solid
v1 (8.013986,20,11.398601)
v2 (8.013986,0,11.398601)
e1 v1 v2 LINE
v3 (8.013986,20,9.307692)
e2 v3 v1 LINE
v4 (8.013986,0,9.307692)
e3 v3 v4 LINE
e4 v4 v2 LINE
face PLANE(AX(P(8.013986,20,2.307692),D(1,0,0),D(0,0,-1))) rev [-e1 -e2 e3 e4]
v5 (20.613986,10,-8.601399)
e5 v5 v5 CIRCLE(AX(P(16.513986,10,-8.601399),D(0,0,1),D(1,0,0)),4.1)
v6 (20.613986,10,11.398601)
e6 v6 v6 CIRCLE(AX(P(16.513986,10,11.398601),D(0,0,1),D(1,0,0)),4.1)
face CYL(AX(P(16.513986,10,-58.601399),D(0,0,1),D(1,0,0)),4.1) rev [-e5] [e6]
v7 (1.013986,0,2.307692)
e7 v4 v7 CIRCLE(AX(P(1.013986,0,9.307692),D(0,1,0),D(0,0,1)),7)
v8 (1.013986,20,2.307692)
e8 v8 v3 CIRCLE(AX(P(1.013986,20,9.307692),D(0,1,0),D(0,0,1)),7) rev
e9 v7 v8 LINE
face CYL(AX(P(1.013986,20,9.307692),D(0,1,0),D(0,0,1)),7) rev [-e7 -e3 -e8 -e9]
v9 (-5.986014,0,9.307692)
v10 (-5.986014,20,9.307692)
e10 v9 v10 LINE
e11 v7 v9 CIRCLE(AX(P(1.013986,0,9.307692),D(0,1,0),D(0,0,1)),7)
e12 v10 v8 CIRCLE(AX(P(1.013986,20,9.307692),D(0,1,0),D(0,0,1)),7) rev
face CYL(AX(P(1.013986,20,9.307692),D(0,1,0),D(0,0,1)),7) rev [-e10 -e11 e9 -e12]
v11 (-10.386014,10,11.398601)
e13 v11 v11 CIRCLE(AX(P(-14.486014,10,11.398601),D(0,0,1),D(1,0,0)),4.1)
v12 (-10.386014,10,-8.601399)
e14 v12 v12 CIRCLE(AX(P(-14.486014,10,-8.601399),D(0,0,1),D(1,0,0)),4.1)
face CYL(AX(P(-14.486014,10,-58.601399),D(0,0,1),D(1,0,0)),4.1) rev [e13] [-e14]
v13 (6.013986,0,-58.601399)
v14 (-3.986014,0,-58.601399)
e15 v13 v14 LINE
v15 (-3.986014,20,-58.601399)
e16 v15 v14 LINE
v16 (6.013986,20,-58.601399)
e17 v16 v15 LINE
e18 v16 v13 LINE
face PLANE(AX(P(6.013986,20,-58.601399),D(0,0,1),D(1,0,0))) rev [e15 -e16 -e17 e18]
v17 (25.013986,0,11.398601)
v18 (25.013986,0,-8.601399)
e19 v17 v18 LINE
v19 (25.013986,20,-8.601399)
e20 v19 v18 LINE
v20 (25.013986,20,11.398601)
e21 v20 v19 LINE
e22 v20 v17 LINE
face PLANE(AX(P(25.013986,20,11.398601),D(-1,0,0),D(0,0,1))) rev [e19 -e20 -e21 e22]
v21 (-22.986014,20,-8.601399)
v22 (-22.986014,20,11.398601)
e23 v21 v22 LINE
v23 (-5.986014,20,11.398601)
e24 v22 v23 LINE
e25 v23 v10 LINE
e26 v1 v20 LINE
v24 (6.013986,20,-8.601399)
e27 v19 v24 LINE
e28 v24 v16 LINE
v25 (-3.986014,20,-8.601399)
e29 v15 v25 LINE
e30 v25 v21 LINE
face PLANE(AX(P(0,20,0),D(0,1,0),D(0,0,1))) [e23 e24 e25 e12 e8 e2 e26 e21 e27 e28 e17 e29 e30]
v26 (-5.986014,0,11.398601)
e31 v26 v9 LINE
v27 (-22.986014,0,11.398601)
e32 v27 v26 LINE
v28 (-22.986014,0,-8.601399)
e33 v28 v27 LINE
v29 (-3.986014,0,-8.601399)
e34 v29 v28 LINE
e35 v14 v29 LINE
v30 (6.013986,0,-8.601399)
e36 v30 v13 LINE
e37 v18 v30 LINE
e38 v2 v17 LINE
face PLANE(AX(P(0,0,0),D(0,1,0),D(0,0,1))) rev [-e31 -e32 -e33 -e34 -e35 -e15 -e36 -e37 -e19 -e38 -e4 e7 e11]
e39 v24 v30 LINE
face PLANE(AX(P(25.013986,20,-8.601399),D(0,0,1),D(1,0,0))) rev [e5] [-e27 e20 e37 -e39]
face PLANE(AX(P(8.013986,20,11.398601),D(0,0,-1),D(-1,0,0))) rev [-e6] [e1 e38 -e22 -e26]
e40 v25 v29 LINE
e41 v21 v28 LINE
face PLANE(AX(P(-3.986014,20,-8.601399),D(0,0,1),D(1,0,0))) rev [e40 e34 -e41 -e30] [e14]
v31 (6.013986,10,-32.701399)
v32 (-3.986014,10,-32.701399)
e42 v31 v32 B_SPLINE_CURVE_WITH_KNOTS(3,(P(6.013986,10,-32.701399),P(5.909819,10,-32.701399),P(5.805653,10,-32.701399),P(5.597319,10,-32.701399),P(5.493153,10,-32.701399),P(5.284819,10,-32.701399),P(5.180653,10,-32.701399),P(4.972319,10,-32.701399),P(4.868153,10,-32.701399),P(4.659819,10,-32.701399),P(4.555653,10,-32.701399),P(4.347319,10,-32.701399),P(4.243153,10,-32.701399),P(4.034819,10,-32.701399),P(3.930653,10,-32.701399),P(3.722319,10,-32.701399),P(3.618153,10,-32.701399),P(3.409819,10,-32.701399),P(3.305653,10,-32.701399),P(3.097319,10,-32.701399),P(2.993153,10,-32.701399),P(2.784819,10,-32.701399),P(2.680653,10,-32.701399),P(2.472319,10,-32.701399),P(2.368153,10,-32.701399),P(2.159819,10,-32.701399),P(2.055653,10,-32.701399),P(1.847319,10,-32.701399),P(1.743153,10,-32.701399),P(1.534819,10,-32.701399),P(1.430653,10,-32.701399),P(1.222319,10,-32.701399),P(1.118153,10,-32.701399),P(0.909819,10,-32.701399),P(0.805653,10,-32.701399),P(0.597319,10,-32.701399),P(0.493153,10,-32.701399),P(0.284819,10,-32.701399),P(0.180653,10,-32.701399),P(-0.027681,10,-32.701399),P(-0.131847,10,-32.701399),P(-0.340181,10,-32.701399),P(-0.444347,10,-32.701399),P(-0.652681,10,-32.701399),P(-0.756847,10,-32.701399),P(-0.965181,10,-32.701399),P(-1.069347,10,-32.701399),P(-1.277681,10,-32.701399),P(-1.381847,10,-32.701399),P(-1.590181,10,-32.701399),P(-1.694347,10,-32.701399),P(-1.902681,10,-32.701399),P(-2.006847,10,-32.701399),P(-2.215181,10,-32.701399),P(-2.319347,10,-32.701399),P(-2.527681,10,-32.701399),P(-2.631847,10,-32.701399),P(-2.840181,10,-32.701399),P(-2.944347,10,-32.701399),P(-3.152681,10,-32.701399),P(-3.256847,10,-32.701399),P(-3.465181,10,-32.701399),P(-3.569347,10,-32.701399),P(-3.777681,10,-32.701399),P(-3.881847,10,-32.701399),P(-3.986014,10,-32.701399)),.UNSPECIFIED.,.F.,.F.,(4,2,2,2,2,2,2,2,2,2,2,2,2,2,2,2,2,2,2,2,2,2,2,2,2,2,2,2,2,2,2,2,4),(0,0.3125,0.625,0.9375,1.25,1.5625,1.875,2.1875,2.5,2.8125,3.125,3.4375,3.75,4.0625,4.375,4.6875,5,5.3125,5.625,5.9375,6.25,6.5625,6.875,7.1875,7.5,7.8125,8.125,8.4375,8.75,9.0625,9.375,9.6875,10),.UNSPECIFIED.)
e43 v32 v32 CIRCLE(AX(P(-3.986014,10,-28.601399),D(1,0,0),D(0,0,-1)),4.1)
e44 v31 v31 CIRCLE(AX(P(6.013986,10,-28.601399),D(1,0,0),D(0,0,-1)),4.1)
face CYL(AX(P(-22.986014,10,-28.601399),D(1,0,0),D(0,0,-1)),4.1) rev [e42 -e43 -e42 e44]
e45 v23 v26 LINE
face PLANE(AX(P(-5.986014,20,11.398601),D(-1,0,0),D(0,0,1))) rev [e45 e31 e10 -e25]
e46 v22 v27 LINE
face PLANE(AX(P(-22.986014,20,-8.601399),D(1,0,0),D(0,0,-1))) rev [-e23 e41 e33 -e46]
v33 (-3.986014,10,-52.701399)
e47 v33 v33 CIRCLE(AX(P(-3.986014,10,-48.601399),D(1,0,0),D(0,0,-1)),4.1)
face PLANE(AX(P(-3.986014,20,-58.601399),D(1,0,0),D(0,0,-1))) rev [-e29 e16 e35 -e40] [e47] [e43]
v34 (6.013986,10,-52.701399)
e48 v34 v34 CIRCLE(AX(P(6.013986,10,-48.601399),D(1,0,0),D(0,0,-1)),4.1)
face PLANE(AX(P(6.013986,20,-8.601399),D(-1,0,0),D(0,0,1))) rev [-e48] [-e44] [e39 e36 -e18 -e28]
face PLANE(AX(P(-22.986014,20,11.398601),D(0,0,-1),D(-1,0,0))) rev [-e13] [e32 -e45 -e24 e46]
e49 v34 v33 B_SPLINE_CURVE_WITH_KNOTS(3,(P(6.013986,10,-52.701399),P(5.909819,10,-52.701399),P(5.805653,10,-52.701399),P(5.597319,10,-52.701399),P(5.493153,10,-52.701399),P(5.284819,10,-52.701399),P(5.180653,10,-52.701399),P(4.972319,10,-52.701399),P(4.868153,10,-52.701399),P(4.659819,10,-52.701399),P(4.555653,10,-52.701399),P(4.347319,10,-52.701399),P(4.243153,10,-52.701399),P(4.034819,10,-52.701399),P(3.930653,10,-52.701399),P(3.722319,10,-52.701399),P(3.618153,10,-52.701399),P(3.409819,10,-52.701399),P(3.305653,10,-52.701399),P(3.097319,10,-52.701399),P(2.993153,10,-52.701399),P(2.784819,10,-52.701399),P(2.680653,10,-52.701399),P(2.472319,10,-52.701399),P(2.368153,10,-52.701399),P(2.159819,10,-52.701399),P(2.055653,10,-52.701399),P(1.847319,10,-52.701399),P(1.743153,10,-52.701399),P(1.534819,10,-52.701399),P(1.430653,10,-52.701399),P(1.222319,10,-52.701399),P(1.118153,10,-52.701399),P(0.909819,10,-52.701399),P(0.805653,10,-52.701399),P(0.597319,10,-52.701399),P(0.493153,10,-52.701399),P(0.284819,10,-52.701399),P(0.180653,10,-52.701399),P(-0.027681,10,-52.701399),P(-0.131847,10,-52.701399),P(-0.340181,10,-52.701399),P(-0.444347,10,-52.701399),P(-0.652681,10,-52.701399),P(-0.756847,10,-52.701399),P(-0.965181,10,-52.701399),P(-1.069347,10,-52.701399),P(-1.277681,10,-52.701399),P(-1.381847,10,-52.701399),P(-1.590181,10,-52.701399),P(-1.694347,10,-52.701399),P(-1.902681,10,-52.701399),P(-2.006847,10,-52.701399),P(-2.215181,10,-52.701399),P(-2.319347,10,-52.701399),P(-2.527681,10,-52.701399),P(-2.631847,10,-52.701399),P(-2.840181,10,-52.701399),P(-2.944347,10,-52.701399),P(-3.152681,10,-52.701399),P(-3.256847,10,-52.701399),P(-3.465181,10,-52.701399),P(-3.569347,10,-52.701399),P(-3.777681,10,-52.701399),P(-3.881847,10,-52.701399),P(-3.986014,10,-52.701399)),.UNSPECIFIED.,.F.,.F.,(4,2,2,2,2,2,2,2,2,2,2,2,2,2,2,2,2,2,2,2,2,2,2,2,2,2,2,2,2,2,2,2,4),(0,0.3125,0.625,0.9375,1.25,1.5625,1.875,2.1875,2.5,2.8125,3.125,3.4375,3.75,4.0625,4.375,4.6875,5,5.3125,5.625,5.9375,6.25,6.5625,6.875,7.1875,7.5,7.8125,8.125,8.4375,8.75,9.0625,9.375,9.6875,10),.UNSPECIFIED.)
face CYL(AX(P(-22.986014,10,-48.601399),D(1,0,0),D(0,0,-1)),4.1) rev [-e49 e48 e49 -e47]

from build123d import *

# Parameters (mm, degrees)
BOSS_EXTRUDE1_DEPTH = 20
SKETCH3_R           = 4.1
CUT_EXTRUDE1_DEPTH  = 77.978565174
SKETCH4_R           = 4.1
CUT_EXTRUDE2_DEPTH  = 69.374877828
FILLET1_R           = 7


with BuildPart() as part:
    # Sketch1 → Boss-Extrude1 (new body)
    with BuildSketch(Plane(origin=(0, 0, 0), x_dir=(1, 0, 0), z_dir=(0, 1, 0))):
        Polygon((-22.986013986, 8.601398601), (-22.986013986, -11.398601399), (-5.986013986, -11.398601399), (-5.986013986, -2.307692308), (8.013986014, -2.307692308), (8.013986014, -11.398601399), (25.013986014, -11.398601399), (25.013986014, 8.601398601), (6.013986014, 8.601398601), (6.013986014, 58.601398601), (-3.986013986, 58.601398601), (-3.986013986, 8.601398601), align=None)
    extrude(amount=BOSS_EXTRUDE1_DEPTH)

    # Sketch3 → Cut-Extrude1 (cut, through all)
    with BuildSketch(Plane.XY.offset(11.398601399)):
        with Locations((-14.486013986, 10)):
            Circle(SKETCH3_R)
        with Locations((16.513986014, 10)):
            Circle(SKETCH3_R)
    extrude(amount=-CUT_EXTRUDE1_DEPTH, mode=Mode.SUBTRACT)

    # Sketch4 → Cut-Extrude2 (cut, through all)
    with BuildSketch(Plane(origin=(6.013986014, 0, 0), x_dir=(0, 0, -1), z_dir=(1, 0, 0))):
        with Locations((28.601398601, 10)):
            Circle(SKETCH4_R)
        with Locations((48.601398601, 10)):
            Circle(SKETCH4_R)
    extrude(amount=-CUT_EXTRUDE2_DEPTH, mode=Mode.SUBTRACT)

    # Fillet1
    fillet1_edges = [part.edges().sort_by_distance(p)[0] for p in [
        (-5.986013986, 10, 2.307692308),
        (8.013986014, 10, 2.307692308),
    ]]
    fillet(fillet1_edges, radius=FILLET1_R - 0.0001)  # a hair under: the kernel refuses the full size


solid = part.part
